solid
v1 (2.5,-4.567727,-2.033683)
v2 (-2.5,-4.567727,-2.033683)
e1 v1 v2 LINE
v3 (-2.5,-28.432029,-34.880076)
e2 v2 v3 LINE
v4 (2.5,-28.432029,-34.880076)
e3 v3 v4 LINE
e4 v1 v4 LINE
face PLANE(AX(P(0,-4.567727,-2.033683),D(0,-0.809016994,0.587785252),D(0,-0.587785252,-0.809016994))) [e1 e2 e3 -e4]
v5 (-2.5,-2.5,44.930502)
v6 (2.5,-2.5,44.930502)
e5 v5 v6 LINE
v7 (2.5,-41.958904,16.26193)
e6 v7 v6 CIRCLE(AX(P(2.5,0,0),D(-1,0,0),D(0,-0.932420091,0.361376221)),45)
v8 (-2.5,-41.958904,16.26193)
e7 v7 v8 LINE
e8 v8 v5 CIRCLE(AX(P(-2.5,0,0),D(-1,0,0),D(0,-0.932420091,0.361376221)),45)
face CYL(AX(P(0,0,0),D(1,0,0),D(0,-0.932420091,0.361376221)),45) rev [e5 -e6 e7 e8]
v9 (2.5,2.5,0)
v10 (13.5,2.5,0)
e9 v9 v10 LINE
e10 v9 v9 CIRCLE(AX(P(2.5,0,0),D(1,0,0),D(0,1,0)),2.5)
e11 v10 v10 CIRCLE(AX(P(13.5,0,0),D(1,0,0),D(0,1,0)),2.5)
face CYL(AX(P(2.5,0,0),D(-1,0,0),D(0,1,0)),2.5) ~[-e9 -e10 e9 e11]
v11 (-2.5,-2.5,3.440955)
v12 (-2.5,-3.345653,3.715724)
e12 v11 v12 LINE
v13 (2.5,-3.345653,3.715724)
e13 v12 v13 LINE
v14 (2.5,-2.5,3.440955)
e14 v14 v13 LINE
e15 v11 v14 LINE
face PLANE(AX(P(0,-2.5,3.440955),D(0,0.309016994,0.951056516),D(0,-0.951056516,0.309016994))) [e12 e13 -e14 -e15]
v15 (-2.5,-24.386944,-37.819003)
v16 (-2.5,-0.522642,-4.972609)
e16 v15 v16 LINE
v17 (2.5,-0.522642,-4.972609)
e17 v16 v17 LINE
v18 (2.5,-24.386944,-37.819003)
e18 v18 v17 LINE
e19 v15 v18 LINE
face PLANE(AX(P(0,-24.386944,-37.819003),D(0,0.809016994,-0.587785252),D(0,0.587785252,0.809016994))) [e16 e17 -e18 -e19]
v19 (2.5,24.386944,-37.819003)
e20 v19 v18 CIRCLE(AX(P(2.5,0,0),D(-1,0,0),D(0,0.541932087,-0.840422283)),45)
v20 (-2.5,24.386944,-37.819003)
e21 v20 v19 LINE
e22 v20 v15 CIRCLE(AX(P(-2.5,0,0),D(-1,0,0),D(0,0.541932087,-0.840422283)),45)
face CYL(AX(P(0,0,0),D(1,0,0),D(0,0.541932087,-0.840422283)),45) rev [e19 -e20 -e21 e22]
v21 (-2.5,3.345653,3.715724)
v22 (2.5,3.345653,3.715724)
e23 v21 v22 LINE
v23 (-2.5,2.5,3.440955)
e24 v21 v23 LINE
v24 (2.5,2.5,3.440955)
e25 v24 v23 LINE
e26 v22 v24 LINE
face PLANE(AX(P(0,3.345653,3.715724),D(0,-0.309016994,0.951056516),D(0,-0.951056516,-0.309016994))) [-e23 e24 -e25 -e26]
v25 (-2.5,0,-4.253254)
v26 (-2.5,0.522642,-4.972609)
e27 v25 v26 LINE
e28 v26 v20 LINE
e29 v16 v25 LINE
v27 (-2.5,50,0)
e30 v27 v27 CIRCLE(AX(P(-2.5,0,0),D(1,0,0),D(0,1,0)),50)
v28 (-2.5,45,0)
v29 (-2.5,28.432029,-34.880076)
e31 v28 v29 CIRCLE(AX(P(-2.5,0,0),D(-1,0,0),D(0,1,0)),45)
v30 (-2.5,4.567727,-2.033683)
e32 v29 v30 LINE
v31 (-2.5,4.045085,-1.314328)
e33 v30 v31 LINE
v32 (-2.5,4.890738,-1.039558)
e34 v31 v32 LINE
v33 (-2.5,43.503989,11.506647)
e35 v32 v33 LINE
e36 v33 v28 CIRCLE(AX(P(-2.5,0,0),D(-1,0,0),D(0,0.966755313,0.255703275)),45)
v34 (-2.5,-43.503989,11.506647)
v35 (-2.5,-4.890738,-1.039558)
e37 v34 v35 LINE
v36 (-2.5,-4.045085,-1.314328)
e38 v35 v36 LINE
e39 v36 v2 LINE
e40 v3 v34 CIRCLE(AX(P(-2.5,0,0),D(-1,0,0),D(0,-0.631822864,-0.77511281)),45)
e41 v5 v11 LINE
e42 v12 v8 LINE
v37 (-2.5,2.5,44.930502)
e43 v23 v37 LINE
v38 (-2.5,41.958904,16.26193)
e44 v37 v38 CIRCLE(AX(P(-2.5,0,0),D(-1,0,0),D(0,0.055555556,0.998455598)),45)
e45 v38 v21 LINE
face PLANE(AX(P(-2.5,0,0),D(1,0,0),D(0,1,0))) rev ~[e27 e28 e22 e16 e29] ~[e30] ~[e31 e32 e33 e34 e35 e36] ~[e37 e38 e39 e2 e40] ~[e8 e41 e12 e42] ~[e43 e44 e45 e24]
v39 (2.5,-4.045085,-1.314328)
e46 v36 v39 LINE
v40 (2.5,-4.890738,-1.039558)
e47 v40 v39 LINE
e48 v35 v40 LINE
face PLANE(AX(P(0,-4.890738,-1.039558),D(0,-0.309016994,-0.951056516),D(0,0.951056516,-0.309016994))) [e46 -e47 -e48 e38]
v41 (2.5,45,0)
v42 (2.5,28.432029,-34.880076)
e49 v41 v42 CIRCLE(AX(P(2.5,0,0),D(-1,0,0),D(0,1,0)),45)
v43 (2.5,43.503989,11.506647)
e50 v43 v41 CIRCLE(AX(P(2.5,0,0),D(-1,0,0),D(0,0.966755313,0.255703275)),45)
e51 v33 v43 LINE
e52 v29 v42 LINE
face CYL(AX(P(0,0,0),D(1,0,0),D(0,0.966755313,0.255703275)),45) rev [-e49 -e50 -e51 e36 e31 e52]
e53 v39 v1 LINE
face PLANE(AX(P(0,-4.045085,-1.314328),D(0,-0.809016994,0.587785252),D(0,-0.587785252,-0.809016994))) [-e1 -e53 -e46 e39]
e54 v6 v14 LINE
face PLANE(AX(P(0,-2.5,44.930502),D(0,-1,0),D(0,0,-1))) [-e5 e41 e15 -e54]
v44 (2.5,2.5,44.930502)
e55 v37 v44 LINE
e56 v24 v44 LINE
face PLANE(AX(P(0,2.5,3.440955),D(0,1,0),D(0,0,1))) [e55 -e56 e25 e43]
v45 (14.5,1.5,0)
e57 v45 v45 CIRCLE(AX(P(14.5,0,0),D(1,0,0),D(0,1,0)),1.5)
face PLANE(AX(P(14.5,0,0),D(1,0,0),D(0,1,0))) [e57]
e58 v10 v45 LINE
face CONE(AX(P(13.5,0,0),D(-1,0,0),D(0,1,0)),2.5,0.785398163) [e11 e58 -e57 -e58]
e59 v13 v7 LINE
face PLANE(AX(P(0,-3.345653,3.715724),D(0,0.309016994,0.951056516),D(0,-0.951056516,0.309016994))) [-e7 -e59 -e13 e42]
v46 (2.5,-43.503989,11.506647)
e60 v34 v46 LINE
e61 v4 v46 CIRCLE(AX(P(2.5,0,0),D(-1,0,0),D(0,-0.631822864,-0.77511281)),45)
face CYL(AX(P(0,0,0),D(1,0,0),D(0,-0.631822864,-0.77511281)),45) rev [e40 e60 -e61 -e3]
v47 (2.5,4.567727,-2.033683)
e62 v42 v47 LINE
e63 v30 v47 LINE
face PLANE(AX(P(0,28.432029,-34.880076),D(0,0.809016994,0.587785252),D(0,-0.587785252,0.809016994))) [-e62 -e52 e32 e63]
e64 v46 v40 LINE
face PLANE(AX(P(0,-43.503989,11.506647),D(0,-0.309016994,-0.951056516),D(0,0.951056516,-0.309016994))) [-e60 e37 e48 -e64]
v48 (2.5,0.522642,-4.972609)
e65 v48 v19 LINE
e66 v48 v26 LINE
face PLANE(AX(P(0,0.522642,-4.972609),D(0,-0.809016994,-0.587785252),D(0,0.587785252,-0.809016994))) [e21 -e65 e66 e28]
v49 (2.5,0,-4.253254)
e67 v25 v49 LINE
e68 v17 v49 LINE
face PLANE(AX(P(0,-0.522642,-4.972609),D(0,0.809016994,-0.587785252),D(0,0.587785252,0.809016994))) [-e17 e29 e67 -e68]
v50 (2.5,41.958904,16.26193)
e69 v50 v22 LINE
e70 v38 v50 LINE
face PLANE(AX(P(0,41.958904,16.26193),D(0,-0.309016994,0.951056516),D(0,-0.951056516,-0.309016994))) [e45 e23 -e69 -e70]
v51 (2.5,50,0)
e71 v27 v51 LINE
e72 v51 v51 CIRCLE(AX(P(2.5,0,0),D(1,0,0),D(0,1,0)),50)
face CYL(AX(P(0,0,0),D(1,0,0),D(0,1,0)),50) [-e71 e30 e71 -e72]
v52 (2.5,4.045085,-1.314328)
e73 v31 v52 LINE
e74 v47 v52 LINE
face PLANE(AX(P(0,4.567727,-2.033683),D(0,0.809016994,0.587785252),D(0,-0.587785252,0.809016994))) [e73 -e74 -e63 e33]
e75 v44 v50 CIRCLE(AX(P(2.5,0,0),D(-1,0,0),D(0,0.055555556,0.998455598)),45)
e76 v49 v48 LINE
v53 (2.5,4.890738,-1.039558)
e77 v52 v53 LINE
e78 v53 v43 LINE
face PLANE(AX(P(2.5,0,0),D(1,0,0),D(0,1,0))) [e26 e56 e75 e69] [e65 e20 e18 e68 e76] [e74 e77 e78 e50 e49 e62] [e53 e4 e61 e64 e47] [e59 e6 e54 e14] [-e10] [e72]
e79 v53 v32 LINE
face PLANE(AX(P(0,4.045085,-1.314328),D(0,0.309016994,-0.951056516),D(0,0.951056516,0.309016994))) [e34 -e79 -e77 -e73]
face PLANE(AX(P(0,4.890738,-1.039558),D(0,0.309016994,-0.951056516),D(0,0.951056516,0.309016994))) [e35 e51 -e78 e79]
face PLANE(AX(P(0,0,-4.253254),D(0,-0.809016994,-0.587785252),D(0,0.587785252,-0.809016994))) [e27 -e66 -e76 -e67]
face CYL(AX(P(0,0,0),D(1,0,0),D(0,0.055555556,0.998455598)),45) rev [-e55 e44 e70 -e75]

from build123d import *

# Parameters (mm, degrees)
F0_R     = 50
F1_DEPTH = 2.5
F2_R     = 2.5
F3_DEPTH = 12
F4_SIZE  = 1


with BuildPart() as f1:
    # F0 (on Right) → F1 (new body, symmetric)
    with BuildSketch(Plane.YZ):
        Circle(F0_R)
        with BuildLine():
            ThreePointArc((2.5, 44.930501889), (26.4503363532, 36.4057647469), (41.958904116, 16.2619299402))
            ThreePointArc((41.958904116, 16.2619299402), (42.7975432333, 13.9057647469), (43.5039890879, 11.5066473588))
            ThreePointArc((43.5039890879, 11.5066473588), (44.6244300185, 5.8017450411), (45, 0))
            ThreePointArc((45, 0), (40.6475171403, -19.3074946672), (28.4320288744, -34.8800764633))
            ThreePointArc((28.4320288744, -34.8800764633), (26.4503363532, -36.4057647469), (24.3869439025, -37.8190027248))
            ThreePointArc((24.3869439025, -37.8190027248), (0, -45), (-24.3869439025, -37.8190027248))
            ThreePointArc((-24.3869439025, -37.8190027248), (-26.4503363532, -36.4057647469), (-28.4320288744, -34.8800764633))
            ThreePointArc((-28.4320288744, -34.8800764633), (-42.7975432333, -13.9057647469), (-43.5039890879, 11.5066473588))
            ThreePointArc((-43.5039890879, 11.5066473588), (-42.7975432333, 13.9057647469), (-41.958904116, 16.2619299402))
            ThreePointArc((-41.958904116, 16.2619299402), (-26.4503363532, 36.4057647469), (-2.5, 44.930501889))
            ThreePointArc((-2.5, 44.930501889), (0, 45), (2.5, 44.930501889))
        make_face(mode=Mode.SUBTRACT)
        with BuildLine():
            ThreePointArc((-2.5, 4.3301270189), (0, 5), (2.5, 4.3301270189))
            Line((2.5, 4.3301270189), (2.5, 44.930501889))
            ThreePointArc((2.5, 44.930501889), (0, 45), (-2.5, 44.930501889))
            Line((-2.5, 44.930501889), (-2.5, 4.3301270189))
        make_face()
        with BuildLine():
            ThreePointArc((-4.8907380037, -1.0395584541), (-4.7552825815, 1.5450849719), (-3.3456530318, 3.7157241274))
            Line((-3.3456530318, 3.7157241274), (-41.958904116, 16.2619299402))
            ThreePointArc((-41.958904116, 16.2619299402), (-42.7975432333, 13.9057647469), (-43.5039890879, 11.5066473588))
            Line((-43.5039890879, 11.5066473588), (-4.8907380037, -1.0395584541))
        make_face()
        with BuildLine():
            Line((-24.3869439025, -37.8190027248), (-0.5226423163, -4.9726094768))
            ThreePointArc((-0.5226423163, -4.9726094768), (-2.9389262615, -4.0450849719), (-4.5677272882, -2.0336832154))
            Line((-4.5677272882, -2.0336832154), (-28.4320288744, -34.8800764633))
            ThreePointArc((-28.4320288744, -34.8800764633), (-26.4503363532, -36.4057647469), (-24.3869439025, -37.8190027248))
        make_face()
        with BuildLine():
            Line((28.4320288744, -34.8800764633), (4.5677272882, -2.0336832154))
            ThreePointArc((4.5677272882, -2.0336832154), (2.9389262615, -4.0450849719), (0.5226423163, -4.9726094768))
            Line((0.5226423163, -4.9726094768), (24.3869439025, -37.8190027248))
            ThreePointArc((24.3869439025, -37.8190027248), (26.4503363532, -36.4057647469), (28.4320288744, -34.8800764633))
        make_face()
        with BuildLine():
            ThreePointArc((3.3456530318, 3.7157241274), (4.5677272882, 2.0336832154), (5, 0))
            ThreePointArc((5, 0), (4.9726094768, -0.5226423163), (4.8907380037, -1.0395584541))
            Line((4.8907380037, -1.0395584541), (43.5039890879, 11.5066473588))
            ThreePointArc((43.5039890879, 11.5066473588), (42.7975432333, 13.9057647469), (41.958904116, 16.2619299402))
            Line((41.958904116, 16.2619299402), (3.3456530318, 3.7157241274))
        make_face()
        Polygon((2.5, 0.8122992406), (2.5, 3.4409548012), (0, 2.6286555606), (-2.5, 3.4409548012), (-2.5, 0.8122992406), (-4.0450849719, -1.3143277803), (-1.5450849719, -2.1266270209), (0, -4.2532540418), (1.5450849719, -2.1266270209), (4.0450849719, -1.3143277803), align=None)
        with BuildLine():
            Line((2.5, 3.4409548012), (2.5, 4.3301270189))
            ThreePointArc((2.5, 4.3301270189), (0, 5), (-2.5, 4.3301270189))
            Line((-2.5, 4.3301270189), (-2.5, 3.4409548012))
            Line((-2.5, 3.4409548012), (0, 2.6286555606))
            Line((0, 2.6286555606), (2.5, 3.4409548012))
        make_face()
        with BuildLine():
            Line((-2.5, 3.4409548012), (-3.3456530318, 3.7157241274))
            ThreePointArc((-3.3456530318, 3.7157241274), (-4.7552825815, 1.5450849719), (-4.8907380037, -1.0395584541))
            Line((-4.8907380037, -1.0395584541), (-4.0450849719, -1.3143277803))
            Line((-4.0450849719, -1.3143277803), (-2.5, 0.8122992406))
            Line((-2.5, 0.8122992406), (-2.5, 3.4409548012))
        make_face()
        with BuildLine():
            ThreePointArc((-4.5677272882, -2.0336832154), (-2.9389262615, -4.0450849719), (-0.5226423163, -4.9726094768))
            Line((-0.5226423163, -4.9726094768), (0, -4.2532540418))
            Line((0, -4.2532540418), (-1.5450849719, -2.1266270209))
            Line((-1.5450849719, -2.1266270209), (-4.0450849719, -1.3143277803))
            Line((-4.0450849719, -1.3143277803), (-4.5677272882, -2.0336832154))
        make_face()
        with BuildLine():
            ThreePointArc((0.5226423163, -4.9726094768), (2.9389262615, -4.0450849719), (4.5677272882, -2.0336832154))
            Line((4.5677272882, -2.0336832154), (4.0450849719, -1.3143277803))
            Line((4.0450849719, -1.3143277803), (1.5450849719, -2.1266270209))
            Line((1.5450849719, -2.1266270209), (0, -4.2532540418))
            Line((0, -4.2532540418), (0.5226423163, -4.9726094768))
        make_face()
        with BuildLine():
            ThreePointArc((4.8907380037, -1.0395584541), (4.9726094768, -0.5226423163), (5, 0))
            ThreePointArc((5, 0), (4.5677272882, 2.0336832154), (3.3456530318, 3.7157241274))
            Line((3.3456530318, 3.7157241274), (2.5, 3.4409548012))
            Line((2.5, 3.4409548012), (2.5, 0.8122992406))
            Line((2.5, 0.8122992406), (4.0450849719, -1.3143277803))
            Line((4.0450849719, -1.3143277803), (4.8907380037, -1.0395584541))
        make_face()
    extrude(amount=F1_DEPTH, both=True)

    # F2 (on face) → F3 (join)
    with BuildSketch(Plane.YZ.offset(2.5)):
        Circle(F2_R)
    extrude(amount=F3_DEPTH)

    # F4
    f4_edges = [f1.edges().sort_by_distance(p)[0] for p in [
        (14.5, -2.5, 0),
    ]]
    chamfer(f4_edges, length=F4_SIZE)


solid = f1.part
